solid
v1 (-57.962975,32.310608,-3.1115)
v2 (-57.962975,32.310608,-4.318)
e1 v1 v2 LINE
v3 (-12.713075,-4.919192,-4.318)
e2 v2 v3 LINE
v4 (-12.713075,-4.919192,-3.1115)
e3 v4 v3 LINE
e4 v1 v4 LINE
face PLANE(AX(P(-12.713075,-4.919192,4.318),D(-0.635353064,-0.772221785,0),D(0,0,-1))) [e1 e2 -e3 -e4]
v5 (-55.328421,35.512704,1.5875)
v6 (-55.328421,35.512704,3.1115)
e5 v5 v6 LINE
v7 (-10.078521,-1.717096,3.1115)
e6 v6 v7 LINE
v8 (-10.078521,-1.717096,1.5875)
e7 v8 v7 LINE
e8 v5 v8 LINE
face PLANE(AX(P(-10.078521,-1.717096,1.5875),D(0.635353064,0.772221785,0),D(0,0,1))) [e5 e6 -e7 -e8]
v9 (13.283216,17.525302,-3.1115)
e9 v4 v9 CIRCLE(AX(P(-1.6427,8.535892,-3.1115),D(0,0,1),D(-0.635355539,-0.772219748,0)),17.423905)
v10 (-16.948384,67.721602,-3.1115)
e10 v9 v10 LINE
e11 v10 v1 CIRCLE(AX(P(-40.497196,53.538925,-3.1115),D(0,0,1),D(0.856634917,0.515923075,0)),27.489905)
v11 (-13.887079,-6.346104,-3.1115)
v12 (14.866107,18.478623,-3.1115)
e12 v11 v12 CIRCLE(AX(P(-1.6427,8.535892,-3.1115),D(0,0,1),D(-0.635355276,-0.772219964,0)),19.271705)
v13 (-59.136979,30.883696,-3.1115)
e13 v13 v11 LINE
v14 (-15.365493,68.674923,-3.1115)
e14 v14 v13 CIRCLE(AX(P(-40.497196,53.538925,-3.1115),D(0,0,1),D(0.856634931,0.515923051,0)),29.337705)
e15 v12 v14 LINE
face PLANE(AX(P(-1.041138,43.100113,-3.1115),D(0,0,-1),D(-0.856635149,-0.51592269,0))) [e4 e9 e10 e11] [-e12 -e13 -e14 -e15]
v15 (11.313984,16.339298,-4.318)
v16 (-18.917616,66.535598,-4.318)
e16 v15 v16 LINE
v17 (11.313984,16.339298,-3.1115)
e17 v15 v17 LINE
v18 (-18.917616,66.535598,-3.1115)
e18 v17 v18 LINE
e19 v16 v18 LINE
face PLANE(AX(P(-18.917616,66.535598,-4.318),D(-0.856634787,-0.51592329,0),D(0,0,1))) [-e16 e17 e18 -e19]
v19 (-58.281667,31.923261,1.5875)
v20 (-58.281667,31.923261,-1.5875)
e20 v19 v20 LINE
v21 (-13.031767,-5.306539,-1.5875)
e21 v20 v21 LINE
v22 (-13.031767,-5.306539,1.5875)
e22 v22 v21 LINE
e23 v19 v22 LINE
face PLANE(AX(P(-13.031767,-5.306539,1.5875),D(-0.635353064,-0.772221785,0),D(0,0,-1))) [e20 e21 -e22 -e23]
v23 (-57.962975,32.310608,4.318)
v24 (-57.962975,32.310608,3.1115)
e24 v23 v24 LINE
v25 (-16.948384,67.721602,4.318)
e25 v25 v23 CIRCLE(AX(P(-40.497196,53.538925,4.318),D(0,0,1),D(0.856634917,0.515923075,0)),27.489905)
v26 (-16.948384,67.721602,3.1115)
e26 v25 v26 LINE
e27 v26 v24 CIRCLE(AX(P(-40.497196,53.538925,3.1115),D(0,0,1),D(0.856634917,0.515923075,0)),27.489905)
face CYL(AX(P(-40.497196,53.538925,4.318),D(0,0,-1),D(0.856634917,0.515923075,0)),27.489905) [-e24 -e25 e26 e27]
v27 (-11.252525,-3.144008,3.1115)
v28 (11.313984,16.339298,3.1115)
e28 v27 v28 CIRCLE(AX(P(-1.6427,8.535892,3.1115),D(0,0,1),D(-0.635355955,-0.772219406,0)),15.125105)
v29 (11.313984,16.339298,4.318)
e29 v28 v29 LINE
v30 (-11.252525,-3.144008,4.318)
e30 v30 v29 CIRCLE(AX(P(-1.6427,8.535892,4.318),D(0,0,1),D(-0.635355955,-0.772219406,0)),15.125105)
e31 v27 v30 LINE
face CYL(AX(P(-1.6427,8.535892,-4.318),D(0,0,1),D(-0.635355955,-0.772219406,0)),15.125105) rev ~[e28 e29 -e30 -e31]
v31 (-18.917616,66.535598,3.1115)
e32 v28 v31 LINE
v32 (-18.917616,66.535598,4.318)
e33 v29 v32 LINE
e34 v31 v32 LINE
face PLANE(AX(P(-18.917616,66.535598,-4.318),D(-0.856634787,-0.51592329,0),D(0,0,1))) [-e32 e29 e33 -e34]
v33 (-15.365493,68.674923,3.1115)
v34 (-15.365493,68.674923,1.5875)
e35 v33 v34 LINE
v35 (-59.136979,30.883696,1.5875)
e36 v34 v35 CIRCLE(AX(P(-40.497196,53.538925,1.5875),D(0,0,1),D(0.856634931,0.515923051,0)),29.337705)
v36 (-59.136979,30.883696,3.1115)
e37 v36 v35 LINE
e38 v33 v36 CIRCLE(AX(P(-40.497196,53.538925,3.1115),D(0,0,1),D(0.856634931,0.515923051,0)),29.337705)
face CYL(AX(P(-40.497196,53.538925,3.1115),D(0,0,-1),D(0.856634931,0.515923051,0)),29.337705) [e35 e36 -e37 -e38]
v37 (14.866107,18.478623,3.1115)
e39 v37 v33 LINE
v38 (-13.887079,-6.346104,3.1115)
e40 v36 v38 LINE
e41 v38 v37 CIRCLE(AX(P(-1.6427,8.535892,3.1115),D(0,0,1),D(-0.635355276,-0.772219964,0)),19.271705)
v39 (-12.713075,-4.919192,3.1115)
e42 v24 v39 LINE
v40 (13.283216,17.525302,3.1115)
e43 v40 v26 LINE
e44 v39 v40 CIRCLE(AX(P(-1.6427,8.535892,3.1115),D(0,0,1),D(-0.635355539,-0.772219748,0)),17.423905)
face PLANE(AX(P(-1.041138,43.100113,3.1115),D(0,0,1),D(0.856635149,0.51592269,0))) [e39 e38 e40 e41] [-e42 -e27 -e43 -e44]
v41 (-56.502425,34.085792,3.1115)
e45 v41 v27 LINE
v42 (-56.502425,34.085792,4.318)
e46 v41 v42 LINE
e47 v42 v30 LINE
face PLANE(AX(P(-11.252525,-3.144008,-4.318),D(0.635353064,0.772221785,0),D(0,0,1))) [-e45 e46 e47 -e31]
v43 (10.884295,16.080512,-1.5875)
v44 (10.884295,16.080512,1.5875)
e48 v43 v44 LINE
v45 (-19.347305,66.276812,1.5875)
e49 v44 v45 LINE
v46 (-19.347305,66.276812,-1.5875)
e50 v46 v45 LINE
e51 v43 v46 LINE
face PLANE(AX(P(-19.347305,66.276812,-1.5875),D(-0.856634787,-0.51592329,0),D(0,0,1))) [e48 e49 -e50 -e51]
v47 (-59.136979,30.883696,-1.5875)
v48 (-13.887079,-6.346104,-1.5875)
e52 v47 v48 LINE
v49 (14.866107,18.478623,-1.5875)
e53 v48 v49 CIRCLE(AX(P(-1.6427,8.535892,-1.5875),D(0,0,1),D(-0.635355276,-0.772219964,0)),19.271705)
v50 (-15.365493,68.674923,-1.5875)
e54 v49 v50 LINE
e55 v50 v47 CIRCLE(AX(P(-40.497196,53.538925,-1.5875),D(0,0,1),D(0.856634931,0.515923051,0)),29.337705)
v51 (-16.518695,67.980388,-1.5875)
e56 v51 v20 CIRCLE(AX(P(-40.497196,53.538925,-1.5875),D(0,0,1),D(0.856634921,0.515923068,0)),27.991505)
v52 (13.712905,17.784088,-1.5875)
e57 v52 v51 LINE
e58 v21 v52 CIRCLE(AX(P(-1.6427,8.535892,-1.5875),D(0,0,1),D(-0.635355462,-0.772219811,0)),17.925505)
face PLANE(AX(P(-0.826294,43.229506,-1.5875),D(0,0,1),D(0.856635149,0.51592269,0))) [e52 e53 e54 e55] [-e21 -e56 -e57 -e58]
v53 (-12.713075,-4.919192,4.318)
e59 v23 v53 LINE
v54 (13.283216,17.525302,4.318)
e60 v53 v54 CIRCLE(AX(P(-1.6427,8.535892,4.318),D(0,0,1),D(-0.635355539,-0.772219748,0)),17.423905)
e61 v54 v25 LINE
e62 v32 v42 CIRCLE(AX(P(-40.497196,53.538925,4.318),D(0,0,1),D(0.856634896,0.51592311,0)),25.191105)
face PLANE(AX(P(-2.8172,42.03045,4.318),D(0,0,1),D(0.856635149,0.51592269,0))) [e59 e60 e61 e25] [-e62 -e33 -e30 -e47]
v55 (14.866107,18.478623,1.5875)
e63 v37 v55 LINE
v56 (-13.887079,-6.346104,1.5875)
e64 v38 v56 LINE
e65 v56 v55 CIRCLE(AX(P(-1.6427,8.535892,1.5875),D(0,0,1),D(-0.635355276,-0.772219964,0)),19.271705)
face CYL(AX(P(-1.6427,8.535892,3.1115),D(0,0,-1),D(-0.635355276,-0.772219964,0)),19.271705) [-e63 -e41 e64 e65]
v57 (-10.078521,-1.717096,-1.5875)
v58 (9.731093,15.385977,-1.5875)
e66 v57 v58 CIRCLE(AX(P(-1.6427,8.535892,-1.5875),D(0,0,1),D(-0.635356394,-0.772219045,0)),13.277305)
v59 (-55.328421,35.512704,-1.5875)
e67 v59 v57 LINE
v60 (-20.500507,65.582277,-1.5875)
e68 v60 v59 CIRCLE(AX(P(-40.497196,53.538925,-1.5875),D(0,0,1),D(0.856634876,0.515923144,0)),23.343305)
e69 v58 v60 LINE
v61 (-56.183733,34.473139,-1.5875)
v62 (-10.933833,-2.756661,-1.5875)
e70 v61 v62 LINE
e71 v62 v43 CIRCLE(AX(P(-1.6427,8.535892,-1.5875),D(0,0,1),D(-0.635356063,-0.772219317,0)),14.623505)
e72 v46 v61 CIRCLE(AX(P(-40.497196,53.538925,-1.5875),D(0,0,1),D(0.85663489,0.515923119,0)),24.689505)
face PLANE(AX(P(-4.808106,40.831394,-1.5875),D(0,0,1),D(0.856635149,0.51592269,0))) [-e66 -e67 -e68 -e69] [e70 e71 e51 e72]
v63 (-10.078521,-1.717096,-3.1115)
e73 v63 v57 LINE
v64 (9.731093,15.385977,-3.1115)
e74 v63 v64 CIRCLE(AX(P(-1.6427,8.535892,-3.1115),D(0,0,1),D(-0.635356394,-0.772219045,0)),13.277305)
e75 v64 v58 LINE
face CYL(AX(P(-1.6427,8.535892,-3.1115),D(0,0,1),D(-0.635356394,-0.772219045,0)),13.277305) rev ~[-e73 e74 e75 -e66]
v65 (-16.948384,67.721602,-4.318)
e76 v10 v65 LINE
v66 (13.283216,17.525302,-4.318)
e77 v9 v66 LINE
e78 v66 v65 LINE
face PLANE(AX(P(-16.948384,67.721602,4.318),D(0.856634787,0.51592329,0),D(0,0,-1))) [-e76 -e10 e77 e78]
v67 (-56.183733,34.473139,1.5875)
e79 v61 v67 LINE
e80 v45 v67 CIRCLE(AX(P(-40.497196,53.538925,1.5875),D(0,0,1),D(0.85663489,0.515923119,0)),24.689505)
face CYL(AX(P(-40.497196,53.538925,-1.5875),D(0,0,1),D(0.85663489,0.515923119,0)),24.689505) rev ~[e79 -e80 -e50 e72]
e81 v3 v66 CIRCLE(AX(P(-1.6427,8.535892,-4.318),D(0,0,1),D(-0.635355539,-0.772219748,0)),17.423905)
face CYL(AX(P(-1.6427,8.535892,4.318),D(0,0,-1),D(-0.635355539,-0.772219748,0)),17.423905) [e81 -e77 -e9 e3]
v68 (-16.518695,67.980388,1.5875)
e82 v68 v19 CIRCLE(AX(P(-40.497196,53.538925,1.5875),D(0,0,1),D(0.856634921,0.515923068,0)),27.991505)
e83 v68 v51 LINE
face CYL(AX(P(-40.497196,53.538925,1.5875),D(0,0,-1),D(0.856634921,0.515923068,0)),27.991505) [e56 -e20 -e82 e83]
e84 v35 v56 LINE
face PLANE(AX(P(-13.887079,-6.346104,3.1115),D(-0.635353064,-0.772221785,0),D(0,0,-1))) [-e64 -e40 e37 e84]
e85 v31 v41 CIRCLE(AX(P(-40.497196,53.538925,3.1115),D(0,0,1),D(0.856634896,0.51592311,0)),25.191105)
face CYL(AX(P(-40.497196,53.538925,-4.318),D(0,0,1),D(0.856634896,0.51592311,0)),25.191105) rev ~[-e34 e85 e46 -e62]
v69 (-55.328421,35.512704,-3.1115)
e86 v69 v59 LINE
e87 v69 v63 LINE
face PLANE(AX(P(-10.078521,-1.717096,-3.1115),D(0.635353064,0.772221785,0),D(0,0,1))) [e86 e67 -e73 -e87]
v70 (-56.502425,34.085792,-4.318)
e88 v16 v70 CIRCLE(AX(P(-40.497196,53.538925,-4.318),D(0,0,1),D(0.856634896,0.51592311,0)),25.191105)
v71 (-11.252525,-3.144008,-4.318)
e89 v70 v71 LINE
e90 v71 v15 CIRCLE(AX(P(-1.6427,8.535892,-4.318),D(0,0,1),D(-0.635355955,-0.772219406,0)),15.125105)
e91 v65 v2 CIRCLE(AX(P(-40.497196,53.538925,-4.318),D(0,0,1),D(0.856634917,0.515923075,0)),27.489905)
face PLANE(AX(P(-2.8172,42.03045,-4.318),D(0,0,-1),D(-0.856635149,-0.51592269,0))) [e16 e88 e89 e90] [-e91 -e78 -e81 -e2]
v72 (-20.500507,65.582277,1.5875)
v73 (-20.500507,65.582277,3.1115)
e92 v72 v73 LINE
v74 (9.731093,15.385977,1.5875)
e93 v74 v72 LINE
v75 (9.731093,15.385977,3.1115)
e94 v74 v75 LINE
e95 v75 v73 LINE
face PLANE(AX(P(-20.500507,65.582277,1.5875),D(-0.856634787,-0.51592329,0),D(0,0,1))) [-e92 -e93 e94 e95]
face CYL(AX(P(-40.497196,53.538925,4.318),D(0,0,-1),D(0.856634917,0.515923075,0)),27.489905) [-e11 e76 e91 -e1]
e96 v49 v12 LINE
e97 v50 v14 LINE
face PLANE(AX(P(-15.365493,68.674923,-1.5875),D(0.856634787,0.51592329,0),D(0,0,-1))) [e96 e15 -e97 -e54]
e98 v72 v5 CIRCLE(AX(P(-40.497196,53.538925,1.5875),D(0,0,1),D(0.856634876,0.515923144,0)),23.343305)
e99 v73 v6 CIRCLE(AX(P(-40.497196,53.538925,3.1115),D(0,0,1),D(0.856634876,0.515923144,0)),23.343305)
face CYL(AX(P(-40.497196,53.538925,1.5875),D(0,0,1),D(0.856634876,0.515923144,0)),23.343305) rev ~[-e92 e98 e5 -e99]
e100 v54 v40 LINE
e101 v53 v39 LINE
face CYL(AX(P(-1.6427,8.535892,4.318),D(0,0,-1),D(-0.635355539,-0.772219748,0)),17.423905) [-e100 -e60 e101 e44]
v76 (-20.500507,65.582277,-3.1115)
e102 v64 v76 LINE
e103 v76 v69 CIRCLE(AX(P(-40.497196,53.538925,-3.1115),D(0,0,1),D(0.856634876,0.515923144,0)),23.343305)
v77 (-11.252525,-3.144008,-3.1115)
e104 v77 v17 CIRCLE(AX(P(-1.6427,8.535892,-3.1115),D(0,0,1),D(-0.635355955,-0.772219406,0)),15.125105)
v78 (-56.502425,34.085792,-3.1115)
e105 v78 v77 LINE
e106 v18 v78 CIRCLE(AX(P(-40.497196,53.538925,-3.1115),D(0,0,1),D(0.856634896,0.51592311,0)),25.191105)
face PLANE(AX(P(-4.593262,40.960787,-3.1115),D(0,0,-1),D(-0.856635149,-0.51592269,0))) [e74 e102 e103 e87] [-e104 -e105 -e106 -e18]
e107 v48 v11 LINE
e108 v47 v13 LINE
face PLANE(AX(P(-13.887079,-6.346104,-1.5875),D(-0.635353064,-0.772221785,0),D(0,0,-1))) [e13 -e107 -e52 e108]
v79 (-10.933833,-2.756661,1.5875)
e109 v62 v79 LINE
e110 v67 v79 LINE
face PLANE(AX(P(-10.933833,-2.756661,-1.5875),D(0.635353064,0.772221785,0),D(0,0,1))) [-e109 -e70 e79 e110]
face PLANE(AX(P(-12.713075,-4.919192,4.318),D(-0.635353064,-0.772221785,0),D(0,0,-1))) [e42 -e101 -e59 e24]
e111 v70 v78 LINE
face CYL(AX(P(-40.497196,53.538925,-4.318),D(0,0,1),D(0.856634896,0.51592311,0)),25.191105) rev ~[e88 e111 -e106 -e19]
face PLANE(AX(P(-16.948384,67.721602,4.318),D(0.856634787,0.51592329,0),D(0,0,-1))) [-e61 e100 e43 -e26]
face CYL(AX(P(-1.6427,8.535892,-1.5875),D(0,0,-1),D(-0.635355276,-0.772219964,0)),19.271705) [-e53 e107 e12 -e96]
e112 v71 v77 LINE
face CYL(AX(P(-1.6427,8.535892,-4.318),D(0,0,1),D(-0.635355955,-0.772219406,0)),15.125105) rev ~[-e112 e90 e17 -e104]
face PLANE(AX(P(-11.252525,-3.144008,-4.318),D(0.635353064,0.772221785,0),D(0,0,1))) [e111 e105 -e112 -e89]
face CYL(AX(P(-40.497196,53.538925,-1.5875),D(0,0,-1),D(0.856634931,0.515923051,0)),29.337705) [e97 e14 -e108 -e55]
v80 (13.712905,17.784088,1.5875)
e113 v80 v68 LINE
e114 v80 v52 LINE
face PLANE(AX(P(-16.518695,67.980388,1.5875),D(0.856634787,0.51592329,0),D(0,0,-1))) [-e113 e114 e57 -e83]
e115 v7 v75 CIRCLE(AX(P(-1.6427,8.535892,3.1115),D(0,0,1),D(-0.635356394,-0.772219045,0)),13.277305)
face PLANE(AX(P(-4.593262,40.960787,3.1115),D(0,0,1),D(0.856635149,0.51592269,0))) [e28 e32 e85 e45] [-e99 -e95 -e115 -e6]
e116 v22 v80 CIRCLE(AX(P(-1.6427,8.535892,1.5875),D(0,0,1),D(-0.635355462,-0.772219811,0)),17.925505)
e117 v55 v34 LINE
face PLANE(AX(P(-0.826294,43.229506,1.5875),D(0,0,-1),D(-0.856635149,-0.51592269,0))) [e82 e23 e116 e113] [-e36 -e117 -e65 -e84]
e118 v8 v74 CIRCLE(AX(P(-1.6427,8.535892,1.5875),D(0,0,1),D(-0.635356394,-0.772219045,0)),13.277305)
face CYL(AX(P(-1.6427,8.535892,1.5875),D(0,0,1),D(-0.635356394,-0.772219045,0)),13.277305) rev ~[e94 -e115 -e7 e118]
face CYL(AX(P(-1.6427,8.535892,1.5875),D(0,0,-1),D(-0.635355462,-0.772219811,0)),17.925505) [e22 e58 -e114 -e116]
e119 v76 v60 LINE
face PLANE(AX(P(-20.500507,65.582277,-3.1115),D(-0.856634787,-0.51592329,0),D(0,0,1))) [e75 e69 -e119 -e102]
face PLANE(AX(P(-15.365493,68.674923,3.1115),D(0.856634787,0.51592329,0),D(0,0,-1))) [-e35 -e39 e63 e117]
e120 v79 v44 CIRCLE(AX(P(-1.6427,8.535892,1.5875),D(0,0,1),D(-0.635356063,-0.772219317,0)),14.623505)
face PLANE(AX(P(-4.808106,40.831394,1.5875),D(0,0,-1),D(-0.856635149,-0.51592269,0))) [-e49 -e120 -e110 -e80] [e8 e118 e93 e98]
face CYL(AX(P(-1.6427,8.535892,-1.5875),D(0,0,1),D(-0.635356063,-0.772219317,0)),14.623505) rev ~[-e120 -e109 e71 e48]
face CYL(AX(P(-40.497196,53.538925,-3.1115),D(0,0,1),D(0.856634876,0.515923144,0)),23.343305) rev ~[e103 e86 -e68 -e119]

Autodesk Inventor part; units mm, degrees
ref_plane "РабПлоскость2" through (-40.4972, 53.5389, 0) normal (-1, 0, 0) x (0, 0, 1)
ref_plane "РабПлоскость3" through (-1.6427, 8.5359, 0) normal (-0.3338521, 0.9426255, 0) x (0, 0, 1)
sketch "Траектория" plane through (0, 0, 0) normal (0, 0, 1) x (1, 0, 0)
  arc A0 (-17.933, 67.1286) -> (-57.2327, 33.1982) centre (-40.4972, 53.5389) ccw
  arc A1 (-11.9828, -4.0316) -> (12.2986, 16.9323) centre (-1.6427, 8.5359) ccw
  line L0 (-11.9828, -4.0316) -> (-57.2327, 33.1982)
  line L1 (-17.933, 67.1286) -> (12.2986, 16.9323)
  dimension "d31" = 5.9944
ref_plane "Секущая плоскость" through (-57.2327, 33.1982, 0) normal (0.772222, -0.6353528, 0) x (0, 0, 1)
sketch "Эскиз сечения" plane through (-57.2327, 33.1982, 0) normal (0.772222, -0.6353528, 0) x (0, 0, 1)
  line L0 (-4.318, -1.1494) -> (4.318, -1.1494)
  line L1 (4.318, -1.1494) -> (4.318, 1.1494)
  line L2 (4.318, 1.1494) -> (-4.318, 1.1494)
  line L3 (-4.318, 1.1494) -> (-4.318, -1.1494)
  line L4 (-1.5875, -1.651) -> (1.5875, -1.651)
  line L5 (1.5875, -1.651) -> (1.5875, 1.651)
  line L6 (1.5875, 1.651) -> (-1.5875, 1.651)
  line L7 (-1.5875, 1.651) -> (-1.5875, -1.651)
  line L8 (-1.5875, 0) -> (1.5875, 0) construction
  line L9 (-3.1115, -2.9972) -> (-1.5875, -2.9972)
  line L10 (-1.5875, -2.9972) -> (-1.5875, 2.9972)
  line L11 (-1.5875, 2.9972) -> (-3.1115, 2.9972)
  line L12 (-3.1115, 2.9972) -> (-3.1115, -2.9972)
  line L13 (1.5875, -2.9972) -> (3.1115, -2.9972)
  line L14 (3.1115, -2.9972) -> (3.1115, 2.9972)
  line L15 (3.1115, 2.9972) -> (1.5875, 2.9972)
  line L16 (1.5875, 2.9972) -> (1.5875, -2.9972)
  line L17 (-4.318, 0) -> (4.318, 0) construction
  point P0 (0, 0)
  point P1 (0, 0)
  dimension "d21" = 2.2987
  dimension "d22" = 3.302
  dimension "d23" = 3.175
  dimension "d24" = 1.524
  dimension "d31" = 5.9944
  dimension "d32" = 8.636
sweep "Тело" add profiles "Эскиз сечения" path "Траектория"
pattern_of_one "Strand Pattern"
equation "\"d21\" = da_d2"
equation "\"d22\" = da_d1"
equation "\"d23\" = da_b1"
equation "\"d24\" = da_t1 + da_t2"
equation "\"d30\" = da_pt"
equation "\"da_p\" = 6.35"
equation "\"da_b1\" = 3.175"
equation "\"da_h2\" = 5.9944"
equation "\"da_h3\" = 5.207"
equation "\"da_d1\" = 3.302"
equation "\"da_d2\" = 2.2987"
equation "\"da_pt\" = 6.4008"
equation "\"da_b\" = 8.636"
equation "\"da_t1\" = 0.762"
equation "\"da_t2\" = 0.762"
properties part number "цепь гол"
